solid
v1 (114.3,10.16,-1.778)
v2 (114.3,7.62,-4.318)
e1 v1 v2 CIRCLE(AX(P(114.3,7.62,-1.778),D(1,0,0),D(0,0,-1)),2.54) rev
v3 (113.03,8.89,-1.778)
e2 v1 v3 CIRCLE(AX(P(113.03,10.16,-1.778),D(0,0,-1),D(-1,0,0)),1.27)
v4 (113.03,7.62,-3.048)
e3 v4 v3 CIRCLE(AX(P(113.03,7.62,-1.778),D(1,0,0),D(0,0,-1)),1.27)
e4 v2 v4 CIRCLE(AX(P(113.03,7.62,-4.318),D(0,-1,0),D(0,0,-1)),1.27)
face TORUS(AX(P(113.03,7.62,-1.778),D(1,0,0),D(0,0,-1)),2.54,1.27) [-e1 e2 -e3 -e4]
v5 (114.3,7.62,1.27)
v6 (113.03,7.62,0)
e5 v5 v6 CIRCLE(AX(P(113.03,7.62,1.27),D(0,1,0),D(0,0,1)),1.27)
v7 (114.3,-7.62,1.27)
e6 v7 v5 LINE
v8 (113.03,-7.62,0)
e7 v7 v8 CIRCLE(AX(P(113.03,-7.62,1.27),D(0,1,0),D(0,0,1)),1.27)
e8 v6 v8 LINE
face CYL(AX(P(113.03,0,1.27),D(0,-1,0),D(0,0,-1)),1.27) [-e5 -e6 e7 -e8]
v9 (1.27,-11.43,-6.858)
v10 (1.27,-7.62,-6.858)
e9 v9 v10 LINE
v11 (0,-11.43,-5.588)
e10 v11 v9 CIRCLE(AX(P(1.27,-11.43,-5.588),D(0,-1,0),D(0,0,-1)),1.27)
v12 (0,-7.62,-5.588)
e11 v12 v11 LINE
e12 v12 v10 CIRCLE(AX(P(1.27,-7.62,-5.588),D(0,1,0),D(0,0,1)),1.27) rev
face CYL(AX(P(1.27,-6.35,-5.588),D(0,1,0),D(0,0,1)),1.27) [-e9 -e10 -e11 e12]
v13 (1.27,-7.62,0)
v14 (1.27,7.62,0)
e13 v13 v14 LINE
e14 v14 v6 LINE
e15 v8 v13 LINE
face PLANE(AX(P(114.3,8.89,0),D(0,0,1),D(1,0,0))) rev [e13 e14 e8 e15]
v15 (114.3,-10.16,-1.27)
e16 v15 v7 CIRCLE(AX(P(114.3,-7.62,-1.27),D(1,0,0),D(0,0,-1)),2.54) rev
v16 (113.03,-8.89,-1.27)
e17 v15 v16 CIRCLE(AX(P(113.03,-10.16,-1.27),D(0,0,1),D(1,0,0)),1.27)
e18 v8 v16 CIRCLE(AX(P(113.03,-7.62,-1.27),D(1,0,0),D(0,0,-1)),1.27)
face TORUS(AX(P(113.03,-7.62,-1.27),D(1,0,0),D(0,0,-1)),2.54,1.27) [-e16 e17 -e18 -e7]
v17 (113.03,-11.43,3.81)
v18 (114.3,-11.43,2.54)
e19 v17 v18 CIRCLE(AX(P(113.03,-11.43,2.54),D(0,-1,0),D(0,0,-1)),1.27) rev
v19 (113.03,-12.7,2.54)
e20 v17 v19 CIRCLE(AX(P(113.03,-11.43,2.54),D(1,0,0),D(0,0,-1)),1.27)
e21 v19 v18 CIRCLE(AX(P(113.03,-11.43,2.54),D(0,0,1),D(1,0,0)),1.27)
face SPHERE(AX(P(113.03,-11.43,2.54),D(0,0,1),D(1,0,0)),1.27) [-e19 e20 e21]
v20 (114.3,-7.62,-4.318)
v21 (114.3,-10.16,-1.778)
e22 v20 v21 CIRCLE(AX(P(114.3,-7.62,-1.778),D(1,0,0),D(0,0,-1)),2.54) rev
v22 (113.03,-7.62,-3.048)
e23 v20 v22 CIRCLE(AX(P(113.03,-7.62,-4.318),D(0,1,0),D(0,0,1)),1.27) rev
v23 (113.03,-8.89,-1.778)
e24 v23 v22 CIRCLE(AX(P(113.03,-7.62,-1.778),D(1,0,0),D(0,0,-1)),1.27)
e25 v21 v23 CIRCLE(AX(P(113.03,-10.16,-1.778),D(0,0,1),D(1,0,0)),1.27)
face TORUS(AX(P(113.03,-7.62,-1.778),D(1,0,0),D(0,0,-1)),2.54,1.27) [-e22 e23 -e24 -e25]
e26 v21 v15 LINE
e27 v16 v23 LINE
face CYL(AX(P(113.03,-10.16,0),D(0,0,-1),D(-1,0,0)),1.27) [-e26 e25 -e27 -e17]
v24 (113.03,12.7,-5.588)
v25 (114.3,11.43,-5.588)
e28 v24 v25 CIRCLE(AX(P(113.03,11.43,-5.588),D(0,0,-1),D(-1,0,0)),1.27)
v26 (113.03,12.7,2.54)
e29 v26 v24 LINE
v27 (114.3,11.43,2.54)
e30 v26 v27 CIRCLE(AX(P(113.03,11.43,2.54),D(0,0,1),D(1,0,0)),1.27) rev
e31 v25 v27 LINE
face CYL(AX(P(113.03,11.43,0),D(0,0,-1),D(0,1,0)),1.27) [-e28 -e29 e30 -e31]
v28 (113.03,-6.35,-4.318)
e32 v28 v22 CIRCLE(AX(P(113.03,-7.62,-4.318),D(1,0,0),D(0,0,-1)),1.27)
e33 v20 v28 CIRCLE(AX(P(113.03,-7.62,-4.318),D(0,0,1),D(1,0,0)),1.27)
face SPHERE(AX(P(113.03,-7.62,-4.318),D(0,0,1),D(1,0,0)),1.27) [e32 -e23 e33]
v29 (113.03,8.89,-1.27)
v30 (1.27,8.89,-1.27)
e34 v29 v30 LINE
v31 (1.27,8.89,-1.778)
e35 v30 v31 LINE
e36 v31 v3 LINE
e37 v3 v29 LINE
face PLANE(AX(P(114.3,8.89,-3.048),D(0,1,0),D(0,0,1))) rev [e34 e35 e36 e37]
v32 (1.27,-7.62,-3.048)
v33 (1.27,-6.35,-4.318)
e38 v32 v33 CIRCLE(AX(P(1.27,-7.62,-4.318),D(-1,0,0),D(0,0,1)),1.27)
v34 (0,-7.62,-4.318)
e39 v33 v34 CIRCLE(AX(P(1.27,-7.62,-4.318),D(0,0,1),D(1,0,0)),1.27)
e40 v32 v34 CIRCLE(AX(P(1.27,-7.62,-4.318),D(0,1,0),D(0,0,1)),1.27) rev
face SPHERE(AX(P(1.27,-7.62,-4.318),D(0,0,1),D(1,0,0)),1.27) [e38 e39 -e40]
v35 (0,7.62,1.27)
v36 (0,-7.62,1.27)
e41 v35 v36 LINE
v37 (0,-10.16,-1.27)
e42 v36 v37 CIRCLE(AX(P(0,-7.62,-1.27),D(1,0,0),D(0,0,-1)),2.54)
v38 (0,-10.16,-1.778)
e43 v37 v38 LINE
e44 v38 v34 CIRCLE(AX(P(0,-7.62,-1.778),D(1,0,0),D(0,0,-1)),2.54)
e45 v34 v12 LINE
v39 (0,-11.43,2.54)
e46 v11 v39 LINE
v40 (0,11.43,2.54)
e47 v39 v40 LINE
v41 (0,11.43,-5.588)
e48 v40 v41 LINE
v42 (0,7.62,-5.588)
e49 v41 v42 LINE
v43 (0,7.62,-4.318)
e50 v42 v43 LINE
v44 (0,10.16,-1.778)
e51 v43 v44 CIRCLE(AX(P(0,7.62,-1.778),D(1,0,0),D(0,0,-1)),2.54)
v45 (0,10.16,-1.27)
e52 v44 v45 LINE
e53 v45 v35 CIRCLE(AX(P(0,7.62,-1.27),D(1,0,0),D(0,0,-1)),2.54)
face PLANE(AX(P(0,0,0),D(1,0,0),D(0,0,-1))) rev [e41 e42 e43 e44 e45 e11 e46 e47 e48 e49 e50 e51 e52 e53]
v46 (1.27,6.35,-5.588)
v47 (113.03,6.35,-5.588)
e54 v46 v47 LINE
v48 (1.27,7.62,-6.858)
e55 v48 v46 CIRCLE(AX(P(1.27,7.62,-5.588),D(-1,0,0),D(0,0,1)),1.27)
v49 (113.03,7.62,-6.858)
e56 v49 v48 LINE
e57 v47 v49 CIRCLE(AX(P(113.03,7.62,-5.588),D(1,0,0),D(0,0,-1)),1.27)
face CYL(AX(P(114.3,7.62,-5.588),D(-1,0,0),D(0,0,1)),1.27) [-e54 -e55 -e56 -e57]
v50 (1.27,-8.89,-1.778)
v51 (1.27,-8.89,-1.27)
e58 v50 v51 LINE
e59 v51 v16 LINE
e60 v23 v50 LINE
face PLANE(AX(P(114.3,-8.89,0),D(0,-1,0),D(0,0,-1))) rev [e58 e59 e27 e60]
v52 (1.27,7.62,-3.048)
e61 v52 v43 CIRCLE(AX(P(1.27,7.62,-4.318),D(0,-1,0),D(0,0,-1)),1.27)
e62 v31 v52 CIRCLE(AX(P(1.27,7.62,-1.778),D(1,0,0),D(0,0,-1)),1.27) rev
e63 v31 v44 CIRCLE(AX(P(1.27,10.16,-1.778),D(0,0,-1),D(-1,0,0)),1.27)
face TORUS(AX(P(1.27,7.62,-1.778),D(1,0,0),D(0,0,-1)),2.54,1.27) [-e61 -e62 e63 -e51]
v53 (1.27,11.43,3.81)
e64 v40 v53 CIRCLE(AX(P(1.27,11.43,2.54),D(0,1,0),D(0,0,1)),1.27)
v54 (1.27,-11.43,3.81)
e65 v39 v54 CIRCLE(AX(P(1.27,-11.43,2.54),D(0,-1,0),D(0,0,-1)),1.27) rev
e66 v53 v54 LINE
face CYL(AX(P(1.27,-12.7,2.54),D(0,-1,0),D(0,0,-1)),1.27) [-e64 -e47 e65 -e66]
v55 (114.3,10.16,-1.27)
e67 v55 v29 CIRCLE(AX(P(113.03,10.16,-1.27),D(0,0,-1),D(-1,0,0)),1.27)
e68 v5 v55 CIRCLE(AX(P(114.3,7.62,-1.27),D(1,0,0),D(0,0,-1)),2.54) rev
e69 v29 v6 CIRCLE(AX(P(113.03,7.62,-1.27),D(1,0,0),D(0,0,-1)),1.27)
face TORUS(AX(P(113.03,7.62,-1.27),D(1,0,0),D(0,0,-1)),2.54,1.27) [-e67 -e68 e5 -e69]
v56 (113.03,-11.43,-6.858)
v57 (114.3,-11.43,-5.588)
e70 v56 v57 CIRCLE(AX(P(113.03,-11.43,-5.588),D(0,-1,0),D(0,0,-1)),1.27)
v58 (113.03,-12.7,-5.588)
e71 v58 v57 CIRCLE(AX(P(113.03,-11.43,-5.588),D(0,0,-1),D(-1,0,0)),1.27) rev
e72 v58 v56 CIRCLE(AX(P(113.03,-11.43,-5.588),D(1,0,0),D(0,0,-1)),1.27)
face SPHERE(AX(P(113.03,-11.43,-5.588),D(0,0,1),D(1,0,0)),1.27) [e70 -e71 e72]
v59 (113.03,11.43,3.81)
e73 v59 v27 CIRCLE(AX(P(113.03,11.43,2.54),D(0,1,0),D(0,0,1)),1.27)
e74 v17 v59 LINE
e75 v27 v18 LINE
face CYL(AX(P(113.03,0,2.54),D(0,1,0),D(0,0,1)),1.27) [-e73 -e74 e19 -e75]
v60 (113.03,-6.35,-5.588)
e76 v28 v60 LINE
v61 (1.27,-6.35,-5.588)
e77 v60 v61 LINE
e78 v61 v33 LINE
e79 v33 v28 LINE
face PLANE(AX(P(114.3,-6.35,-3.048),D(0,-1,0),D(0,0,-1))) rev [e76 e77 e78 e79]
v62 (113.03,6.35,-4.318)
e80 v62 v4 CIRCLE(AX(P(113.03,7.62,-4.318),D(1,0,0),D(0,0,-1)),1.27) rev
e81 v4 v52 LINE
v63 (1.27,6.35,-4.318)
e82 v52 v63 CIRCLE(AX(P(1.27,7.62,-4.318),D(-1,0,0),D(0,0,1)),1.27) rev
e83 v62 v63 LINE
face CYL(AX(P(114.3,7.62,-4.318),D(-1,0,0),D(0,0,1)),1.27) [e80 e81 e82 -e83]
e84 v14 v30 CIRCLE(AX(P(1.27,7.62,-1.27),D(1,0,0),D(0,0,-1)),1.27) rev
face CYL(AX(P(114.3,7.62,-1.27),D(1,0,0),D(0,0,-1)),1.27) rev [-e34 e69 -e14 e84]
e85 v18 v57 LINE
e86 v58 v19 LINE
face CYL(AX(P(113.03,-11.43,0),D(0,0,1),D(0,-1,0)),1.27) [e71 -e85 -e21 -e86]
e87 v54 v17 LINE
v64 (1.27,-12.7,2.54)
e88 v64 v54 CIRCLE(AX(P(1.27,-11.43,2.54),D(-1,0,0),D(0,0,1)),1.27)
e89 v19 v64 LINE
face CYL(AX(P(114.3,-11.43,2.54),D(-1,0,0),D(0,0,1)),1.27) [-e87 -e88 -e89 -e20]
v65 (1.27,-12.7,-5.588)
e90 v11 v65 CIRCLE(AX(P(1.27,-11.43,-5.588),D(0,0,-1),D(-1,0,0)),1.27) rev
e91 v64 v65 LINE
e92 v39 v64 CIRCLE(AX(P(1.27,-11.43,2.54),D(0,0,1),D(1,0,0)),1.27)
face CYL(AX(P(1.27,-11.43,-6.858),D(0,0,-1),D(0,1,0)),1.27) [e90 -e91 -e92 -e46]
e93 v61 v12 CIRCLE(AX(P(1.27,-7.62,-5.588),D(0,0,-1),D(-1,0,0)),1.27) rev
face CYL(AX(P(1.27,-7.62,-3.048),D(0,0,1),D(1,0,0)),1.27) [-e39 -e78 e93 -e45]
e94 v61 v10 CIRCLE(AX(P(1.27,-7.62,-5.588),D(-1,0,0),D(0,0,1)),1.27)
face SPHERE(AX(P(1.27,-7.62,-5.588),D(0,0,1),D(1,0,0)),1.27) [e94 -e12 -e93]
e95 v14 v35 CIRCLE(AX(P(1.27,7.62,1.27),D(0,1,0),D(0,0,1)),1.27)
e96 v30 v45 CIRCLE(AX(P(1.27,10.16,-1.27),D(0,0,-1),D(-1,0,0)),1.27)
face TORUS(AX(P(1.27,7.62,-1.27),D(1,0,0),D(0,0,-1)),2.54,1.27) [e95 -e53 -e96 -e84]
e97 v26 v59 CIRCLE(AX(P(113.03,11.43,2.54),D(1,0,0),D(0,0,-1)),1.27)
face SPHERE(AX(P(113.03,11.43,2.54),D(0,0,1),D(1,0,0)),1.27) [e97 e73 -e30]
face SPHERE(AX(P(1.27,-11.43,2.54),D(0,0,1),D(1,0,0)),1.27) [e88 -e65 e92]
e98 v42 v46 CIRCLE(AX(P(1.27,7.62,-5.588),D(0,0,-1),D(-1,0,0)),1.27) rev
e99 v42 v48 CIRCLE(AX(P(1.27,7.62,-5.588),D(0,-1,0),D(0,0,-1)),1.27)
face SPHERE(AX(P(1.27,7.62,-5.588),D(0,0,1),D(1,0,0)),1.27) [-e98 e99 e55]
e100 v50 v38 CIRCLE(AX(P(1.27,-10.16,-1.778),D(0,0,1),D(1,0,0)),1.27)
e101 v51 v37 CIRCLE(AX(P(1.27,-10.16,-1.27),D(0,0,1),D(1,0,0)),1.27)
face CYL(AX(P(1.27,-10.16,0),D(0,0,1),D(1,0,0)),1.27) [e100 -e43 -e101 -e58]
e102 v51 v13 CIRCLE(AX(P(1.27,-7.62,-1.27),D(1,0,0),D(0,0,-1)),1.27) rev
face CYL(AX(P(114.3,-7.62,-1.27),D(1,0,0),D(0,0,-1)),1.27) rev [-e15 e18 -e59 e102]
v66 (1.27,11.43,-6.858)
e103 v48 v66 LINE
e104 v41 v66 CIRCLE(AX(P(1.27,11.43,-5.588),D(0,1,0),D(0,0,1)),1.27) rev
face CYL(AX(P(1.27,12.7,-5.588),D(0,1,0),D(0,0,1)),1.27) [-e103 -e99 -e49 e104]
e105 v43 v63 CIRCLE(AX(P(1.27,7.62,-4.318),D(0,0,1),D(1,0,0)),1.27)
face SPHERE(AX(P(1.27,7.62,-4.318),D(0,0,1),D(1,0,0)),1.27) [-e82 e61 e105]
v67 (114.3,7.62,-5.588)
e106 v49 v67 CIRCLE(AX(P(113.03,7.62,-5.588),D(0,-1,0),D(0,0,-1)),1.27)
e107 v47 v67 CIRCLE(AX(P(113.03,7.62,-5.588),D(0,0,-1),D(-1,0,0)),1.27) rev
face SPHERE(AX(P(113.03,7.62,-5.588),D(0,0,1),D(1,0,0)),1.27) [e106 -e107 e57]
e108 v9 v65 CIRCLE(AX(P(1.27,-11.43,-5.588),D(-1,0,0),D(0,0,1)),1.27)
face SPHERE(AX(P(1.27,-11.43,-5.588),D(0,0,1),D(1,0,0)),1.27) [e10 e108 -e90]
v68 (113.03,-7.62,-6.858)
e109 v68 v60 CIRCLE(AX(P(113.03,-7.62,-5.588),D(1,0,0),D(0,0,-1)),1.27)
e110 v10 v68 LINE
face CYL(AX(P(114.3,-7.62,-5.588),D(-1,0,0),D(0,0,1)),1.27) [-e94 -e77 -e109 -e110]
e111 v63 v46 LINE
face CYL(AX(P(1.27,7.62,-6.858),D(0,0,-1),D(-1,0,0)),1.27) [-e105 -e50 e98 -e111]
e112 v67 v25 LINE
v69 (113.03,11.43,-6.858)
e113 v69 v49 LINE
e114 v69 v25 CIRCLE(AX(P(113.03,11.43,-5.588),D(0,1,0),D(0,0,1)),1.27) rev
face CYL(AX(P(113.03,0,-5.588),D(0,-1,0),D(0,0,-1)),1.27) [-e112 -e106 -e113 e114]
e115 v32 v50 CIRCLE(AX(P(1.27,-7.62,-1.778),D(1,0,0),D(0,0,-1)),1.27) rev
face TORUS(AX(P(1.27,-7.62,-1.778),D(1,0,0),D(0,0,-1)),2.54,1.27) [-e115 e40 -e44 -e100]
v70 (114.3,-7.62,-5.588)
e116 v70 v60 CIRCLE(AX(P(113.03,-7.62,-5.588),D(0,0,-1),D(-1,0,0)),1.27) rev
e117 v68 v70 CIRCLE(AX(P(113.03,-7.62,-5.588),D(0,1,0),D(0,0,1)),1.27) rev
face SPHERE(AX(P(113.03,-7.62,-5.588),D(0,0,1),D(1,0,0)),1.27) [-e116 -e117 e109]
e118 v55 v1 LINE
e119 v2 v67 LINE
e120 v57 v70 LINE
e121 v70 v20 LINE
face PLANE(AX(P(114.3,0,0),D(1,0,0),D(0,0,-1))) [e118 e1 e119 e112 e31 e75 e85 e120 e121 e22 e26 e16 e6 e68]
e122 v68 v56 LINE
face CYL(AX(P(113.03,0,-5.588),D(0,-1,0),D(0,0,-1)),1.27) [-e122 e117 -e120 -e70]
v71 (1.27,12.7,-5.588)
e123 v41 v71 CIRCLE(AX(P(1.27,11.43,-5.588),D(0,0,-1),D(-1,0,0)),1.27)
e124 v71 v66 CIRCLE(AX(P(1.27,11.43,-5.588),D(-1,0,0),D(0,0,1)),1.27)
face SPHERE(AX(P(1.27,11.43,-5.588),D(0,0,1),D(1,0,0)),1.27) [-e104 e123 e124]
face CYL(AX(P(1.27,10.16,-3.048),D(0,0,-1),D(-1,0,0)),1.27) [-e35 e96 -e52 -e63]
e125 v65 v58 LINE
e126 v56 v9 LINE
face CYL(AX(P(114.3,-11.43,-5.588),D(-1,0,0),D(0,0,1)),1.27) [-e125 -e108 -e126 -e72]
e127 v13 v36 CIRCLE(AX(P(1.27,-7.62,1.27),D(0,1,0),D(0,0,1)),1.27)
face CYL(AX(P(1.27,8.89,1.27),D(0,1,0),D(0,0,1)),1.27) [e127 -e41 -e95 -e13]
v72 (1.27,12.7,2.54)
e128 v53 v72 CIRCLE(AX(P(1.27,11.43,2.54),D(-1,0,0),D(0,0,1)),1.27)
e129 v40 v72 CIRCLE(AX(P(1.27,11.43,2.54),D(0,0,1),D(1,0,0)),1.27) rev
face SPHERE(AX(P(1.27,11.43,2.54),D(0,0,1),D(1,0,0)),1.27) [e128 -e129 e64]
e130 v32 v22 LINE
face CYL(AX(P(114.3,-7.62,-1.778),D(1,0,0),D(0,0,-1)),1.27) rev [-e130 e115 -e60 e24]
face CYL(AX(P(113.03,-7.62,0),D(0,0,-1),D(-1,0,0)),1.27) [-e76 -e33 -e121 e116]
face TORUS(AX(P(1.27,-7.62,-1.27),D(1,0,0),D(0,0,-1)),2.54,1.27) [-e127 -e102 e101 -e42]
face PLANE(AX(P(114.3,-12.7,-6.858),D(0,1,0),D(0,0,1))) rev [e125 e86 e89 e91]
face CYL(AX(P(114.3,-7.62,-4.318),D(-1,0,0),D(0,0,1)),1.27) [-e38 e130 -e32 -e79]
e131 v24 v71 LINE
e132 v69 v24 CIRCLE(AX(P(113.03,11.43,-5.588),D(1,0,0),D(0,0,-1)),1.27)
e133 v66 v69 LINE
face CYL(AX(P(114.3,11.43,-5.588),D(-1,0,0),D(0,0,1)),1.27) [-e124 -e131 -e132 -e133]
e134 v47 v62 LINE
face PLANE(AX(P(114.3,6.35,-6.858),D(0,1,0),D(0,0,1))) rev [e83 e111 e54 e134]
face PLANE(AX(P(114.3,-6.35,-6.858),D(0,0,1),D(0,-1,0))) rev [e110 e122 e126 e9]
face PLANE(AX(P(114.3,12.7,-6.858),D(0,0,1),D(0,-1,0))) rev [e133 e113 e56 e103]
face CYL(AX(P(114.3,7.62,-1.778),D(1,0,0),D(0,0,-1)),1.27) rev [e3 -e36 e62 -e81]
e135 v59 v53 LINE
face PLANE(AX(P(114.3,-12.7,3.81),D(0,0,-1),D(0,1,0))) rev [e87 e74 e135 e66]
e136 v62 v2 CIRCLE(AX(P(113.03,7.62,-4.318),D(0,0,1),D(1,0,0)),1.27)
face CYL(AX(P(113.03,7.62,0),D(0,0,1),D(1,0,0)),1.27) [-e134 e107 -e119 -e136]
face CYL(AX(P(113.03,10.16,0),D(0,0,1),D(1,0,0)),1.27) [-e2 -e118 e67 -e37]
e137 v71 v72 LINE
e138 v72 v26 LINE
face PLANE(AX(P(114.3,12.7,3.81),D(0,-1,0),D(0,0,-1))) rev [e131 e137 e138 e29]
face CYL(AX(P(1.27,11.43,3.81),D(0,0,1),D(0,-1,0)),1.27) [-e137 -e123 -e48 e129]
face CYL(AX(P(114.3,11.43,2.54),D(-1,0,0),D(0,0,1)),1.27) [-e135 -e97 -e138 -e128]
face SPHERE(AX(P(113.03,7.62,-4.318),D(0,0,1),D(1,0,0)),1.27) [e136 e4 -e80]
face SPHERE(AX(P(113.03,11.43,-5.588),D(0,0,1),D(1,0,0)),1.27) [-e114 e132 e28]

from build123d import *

# Parameters (mm, degrees)
BOSS_EXTRUDE1_DEPTH = 114.3
FILLET1_R           = 1.27
FILLET2_R           = 1.27


with BuildPart() as part:
    # Sketch1 → Boss-Extrude1 (new body)
    with BuildSketch(Plane(origin=(0, 0, 0), x_dir=(0, 0, -1), z_dir=(1, 0, 0))):
        Polygon((0, 8.89), (0, -8.89), (3.048, -8.89), (3.048, -6.35), (6.858, -6.35), (6.858, -12.7), (-3.81, -12.7), (-3.81, 12.7), (6.858, 12.7), (6.858, 6.35), (3.048, 6.35), (3.048, 8.89), align=None)
    extrude(amount=BOSS_EXTRUDE1_DEPTH)

    # Fillet1
    fillet1_edges = [part.edges().sort_by_distance(p)[0] for p in [
        (57.15, 8.89, 0),
        (57.15, -8.89, 0),
        (57.15, -8.89, -3.048),
        (57.15, 8.89, -3.048),
    ]]
    fillet(fillet1_edges, radius=FILLET1_R)

    # Fillet2
    fillet2_edges = [part.edges().sort_by_distance(p)[0] for p in [
        (57.15, 6.35, -3.048),
        (57.15, -6.35, -6.858),
        (57.15, 6.35, -6.858),
        (57.15, -6.35, -3.048),
        (0, 8.518025612, -2.676025612),
        (0, 6.35, -4.953),
        (0, 9.525, -6.858),
        (0, -9.525, -6.858),
        (0, -6.35, -4.953),
        (0, -8.518025612, -2.676025612),
        (0, -8.89, -1.524),
        (0, -8.518025612, -0.371974388),
        (0, 0, 0),
        (0, 8.518025612, -0.371974388),
        (0, 8.89, -1.524),
        (57.15, -12.7, -6.858),
        (0, -12.7, -1.524),
        (57.15, -12.7, 3.81),
        (0, 0, 3.81),
        (114.3, -8.518025612, -0.371974388),
        (114.3, -8.89, -1.524),
        (114.3, -8.518025612, -2.676025612),
        (114.3, -6.35, -4.953),
        (114.3, -9.525, -6.858),
        (114.3, -12.7, -1.524),
        (114.3, 0, 3.81),
        (114.3, 9.525, -6.858),
        (114.3, 6.35, -4.953),
        (114.3, 8.518025612, -2.676025612),
        (114.3, 8.89, -1.524),
        (114.3, 8.518025612, -0.371974388),
        (114.3, 0, 0),
        (57.15, 12.7, -6.858),
        (114.3, 12.7, -1.524),
        (57.15, 12.7, 3.81),
        (0, 12.7, -1.524),
    ]]
    fillet(fillet2_edges, radius=FILLET2_R - 0.0001)  # a hair under: the kernel refuses the full size


solid = part.part
